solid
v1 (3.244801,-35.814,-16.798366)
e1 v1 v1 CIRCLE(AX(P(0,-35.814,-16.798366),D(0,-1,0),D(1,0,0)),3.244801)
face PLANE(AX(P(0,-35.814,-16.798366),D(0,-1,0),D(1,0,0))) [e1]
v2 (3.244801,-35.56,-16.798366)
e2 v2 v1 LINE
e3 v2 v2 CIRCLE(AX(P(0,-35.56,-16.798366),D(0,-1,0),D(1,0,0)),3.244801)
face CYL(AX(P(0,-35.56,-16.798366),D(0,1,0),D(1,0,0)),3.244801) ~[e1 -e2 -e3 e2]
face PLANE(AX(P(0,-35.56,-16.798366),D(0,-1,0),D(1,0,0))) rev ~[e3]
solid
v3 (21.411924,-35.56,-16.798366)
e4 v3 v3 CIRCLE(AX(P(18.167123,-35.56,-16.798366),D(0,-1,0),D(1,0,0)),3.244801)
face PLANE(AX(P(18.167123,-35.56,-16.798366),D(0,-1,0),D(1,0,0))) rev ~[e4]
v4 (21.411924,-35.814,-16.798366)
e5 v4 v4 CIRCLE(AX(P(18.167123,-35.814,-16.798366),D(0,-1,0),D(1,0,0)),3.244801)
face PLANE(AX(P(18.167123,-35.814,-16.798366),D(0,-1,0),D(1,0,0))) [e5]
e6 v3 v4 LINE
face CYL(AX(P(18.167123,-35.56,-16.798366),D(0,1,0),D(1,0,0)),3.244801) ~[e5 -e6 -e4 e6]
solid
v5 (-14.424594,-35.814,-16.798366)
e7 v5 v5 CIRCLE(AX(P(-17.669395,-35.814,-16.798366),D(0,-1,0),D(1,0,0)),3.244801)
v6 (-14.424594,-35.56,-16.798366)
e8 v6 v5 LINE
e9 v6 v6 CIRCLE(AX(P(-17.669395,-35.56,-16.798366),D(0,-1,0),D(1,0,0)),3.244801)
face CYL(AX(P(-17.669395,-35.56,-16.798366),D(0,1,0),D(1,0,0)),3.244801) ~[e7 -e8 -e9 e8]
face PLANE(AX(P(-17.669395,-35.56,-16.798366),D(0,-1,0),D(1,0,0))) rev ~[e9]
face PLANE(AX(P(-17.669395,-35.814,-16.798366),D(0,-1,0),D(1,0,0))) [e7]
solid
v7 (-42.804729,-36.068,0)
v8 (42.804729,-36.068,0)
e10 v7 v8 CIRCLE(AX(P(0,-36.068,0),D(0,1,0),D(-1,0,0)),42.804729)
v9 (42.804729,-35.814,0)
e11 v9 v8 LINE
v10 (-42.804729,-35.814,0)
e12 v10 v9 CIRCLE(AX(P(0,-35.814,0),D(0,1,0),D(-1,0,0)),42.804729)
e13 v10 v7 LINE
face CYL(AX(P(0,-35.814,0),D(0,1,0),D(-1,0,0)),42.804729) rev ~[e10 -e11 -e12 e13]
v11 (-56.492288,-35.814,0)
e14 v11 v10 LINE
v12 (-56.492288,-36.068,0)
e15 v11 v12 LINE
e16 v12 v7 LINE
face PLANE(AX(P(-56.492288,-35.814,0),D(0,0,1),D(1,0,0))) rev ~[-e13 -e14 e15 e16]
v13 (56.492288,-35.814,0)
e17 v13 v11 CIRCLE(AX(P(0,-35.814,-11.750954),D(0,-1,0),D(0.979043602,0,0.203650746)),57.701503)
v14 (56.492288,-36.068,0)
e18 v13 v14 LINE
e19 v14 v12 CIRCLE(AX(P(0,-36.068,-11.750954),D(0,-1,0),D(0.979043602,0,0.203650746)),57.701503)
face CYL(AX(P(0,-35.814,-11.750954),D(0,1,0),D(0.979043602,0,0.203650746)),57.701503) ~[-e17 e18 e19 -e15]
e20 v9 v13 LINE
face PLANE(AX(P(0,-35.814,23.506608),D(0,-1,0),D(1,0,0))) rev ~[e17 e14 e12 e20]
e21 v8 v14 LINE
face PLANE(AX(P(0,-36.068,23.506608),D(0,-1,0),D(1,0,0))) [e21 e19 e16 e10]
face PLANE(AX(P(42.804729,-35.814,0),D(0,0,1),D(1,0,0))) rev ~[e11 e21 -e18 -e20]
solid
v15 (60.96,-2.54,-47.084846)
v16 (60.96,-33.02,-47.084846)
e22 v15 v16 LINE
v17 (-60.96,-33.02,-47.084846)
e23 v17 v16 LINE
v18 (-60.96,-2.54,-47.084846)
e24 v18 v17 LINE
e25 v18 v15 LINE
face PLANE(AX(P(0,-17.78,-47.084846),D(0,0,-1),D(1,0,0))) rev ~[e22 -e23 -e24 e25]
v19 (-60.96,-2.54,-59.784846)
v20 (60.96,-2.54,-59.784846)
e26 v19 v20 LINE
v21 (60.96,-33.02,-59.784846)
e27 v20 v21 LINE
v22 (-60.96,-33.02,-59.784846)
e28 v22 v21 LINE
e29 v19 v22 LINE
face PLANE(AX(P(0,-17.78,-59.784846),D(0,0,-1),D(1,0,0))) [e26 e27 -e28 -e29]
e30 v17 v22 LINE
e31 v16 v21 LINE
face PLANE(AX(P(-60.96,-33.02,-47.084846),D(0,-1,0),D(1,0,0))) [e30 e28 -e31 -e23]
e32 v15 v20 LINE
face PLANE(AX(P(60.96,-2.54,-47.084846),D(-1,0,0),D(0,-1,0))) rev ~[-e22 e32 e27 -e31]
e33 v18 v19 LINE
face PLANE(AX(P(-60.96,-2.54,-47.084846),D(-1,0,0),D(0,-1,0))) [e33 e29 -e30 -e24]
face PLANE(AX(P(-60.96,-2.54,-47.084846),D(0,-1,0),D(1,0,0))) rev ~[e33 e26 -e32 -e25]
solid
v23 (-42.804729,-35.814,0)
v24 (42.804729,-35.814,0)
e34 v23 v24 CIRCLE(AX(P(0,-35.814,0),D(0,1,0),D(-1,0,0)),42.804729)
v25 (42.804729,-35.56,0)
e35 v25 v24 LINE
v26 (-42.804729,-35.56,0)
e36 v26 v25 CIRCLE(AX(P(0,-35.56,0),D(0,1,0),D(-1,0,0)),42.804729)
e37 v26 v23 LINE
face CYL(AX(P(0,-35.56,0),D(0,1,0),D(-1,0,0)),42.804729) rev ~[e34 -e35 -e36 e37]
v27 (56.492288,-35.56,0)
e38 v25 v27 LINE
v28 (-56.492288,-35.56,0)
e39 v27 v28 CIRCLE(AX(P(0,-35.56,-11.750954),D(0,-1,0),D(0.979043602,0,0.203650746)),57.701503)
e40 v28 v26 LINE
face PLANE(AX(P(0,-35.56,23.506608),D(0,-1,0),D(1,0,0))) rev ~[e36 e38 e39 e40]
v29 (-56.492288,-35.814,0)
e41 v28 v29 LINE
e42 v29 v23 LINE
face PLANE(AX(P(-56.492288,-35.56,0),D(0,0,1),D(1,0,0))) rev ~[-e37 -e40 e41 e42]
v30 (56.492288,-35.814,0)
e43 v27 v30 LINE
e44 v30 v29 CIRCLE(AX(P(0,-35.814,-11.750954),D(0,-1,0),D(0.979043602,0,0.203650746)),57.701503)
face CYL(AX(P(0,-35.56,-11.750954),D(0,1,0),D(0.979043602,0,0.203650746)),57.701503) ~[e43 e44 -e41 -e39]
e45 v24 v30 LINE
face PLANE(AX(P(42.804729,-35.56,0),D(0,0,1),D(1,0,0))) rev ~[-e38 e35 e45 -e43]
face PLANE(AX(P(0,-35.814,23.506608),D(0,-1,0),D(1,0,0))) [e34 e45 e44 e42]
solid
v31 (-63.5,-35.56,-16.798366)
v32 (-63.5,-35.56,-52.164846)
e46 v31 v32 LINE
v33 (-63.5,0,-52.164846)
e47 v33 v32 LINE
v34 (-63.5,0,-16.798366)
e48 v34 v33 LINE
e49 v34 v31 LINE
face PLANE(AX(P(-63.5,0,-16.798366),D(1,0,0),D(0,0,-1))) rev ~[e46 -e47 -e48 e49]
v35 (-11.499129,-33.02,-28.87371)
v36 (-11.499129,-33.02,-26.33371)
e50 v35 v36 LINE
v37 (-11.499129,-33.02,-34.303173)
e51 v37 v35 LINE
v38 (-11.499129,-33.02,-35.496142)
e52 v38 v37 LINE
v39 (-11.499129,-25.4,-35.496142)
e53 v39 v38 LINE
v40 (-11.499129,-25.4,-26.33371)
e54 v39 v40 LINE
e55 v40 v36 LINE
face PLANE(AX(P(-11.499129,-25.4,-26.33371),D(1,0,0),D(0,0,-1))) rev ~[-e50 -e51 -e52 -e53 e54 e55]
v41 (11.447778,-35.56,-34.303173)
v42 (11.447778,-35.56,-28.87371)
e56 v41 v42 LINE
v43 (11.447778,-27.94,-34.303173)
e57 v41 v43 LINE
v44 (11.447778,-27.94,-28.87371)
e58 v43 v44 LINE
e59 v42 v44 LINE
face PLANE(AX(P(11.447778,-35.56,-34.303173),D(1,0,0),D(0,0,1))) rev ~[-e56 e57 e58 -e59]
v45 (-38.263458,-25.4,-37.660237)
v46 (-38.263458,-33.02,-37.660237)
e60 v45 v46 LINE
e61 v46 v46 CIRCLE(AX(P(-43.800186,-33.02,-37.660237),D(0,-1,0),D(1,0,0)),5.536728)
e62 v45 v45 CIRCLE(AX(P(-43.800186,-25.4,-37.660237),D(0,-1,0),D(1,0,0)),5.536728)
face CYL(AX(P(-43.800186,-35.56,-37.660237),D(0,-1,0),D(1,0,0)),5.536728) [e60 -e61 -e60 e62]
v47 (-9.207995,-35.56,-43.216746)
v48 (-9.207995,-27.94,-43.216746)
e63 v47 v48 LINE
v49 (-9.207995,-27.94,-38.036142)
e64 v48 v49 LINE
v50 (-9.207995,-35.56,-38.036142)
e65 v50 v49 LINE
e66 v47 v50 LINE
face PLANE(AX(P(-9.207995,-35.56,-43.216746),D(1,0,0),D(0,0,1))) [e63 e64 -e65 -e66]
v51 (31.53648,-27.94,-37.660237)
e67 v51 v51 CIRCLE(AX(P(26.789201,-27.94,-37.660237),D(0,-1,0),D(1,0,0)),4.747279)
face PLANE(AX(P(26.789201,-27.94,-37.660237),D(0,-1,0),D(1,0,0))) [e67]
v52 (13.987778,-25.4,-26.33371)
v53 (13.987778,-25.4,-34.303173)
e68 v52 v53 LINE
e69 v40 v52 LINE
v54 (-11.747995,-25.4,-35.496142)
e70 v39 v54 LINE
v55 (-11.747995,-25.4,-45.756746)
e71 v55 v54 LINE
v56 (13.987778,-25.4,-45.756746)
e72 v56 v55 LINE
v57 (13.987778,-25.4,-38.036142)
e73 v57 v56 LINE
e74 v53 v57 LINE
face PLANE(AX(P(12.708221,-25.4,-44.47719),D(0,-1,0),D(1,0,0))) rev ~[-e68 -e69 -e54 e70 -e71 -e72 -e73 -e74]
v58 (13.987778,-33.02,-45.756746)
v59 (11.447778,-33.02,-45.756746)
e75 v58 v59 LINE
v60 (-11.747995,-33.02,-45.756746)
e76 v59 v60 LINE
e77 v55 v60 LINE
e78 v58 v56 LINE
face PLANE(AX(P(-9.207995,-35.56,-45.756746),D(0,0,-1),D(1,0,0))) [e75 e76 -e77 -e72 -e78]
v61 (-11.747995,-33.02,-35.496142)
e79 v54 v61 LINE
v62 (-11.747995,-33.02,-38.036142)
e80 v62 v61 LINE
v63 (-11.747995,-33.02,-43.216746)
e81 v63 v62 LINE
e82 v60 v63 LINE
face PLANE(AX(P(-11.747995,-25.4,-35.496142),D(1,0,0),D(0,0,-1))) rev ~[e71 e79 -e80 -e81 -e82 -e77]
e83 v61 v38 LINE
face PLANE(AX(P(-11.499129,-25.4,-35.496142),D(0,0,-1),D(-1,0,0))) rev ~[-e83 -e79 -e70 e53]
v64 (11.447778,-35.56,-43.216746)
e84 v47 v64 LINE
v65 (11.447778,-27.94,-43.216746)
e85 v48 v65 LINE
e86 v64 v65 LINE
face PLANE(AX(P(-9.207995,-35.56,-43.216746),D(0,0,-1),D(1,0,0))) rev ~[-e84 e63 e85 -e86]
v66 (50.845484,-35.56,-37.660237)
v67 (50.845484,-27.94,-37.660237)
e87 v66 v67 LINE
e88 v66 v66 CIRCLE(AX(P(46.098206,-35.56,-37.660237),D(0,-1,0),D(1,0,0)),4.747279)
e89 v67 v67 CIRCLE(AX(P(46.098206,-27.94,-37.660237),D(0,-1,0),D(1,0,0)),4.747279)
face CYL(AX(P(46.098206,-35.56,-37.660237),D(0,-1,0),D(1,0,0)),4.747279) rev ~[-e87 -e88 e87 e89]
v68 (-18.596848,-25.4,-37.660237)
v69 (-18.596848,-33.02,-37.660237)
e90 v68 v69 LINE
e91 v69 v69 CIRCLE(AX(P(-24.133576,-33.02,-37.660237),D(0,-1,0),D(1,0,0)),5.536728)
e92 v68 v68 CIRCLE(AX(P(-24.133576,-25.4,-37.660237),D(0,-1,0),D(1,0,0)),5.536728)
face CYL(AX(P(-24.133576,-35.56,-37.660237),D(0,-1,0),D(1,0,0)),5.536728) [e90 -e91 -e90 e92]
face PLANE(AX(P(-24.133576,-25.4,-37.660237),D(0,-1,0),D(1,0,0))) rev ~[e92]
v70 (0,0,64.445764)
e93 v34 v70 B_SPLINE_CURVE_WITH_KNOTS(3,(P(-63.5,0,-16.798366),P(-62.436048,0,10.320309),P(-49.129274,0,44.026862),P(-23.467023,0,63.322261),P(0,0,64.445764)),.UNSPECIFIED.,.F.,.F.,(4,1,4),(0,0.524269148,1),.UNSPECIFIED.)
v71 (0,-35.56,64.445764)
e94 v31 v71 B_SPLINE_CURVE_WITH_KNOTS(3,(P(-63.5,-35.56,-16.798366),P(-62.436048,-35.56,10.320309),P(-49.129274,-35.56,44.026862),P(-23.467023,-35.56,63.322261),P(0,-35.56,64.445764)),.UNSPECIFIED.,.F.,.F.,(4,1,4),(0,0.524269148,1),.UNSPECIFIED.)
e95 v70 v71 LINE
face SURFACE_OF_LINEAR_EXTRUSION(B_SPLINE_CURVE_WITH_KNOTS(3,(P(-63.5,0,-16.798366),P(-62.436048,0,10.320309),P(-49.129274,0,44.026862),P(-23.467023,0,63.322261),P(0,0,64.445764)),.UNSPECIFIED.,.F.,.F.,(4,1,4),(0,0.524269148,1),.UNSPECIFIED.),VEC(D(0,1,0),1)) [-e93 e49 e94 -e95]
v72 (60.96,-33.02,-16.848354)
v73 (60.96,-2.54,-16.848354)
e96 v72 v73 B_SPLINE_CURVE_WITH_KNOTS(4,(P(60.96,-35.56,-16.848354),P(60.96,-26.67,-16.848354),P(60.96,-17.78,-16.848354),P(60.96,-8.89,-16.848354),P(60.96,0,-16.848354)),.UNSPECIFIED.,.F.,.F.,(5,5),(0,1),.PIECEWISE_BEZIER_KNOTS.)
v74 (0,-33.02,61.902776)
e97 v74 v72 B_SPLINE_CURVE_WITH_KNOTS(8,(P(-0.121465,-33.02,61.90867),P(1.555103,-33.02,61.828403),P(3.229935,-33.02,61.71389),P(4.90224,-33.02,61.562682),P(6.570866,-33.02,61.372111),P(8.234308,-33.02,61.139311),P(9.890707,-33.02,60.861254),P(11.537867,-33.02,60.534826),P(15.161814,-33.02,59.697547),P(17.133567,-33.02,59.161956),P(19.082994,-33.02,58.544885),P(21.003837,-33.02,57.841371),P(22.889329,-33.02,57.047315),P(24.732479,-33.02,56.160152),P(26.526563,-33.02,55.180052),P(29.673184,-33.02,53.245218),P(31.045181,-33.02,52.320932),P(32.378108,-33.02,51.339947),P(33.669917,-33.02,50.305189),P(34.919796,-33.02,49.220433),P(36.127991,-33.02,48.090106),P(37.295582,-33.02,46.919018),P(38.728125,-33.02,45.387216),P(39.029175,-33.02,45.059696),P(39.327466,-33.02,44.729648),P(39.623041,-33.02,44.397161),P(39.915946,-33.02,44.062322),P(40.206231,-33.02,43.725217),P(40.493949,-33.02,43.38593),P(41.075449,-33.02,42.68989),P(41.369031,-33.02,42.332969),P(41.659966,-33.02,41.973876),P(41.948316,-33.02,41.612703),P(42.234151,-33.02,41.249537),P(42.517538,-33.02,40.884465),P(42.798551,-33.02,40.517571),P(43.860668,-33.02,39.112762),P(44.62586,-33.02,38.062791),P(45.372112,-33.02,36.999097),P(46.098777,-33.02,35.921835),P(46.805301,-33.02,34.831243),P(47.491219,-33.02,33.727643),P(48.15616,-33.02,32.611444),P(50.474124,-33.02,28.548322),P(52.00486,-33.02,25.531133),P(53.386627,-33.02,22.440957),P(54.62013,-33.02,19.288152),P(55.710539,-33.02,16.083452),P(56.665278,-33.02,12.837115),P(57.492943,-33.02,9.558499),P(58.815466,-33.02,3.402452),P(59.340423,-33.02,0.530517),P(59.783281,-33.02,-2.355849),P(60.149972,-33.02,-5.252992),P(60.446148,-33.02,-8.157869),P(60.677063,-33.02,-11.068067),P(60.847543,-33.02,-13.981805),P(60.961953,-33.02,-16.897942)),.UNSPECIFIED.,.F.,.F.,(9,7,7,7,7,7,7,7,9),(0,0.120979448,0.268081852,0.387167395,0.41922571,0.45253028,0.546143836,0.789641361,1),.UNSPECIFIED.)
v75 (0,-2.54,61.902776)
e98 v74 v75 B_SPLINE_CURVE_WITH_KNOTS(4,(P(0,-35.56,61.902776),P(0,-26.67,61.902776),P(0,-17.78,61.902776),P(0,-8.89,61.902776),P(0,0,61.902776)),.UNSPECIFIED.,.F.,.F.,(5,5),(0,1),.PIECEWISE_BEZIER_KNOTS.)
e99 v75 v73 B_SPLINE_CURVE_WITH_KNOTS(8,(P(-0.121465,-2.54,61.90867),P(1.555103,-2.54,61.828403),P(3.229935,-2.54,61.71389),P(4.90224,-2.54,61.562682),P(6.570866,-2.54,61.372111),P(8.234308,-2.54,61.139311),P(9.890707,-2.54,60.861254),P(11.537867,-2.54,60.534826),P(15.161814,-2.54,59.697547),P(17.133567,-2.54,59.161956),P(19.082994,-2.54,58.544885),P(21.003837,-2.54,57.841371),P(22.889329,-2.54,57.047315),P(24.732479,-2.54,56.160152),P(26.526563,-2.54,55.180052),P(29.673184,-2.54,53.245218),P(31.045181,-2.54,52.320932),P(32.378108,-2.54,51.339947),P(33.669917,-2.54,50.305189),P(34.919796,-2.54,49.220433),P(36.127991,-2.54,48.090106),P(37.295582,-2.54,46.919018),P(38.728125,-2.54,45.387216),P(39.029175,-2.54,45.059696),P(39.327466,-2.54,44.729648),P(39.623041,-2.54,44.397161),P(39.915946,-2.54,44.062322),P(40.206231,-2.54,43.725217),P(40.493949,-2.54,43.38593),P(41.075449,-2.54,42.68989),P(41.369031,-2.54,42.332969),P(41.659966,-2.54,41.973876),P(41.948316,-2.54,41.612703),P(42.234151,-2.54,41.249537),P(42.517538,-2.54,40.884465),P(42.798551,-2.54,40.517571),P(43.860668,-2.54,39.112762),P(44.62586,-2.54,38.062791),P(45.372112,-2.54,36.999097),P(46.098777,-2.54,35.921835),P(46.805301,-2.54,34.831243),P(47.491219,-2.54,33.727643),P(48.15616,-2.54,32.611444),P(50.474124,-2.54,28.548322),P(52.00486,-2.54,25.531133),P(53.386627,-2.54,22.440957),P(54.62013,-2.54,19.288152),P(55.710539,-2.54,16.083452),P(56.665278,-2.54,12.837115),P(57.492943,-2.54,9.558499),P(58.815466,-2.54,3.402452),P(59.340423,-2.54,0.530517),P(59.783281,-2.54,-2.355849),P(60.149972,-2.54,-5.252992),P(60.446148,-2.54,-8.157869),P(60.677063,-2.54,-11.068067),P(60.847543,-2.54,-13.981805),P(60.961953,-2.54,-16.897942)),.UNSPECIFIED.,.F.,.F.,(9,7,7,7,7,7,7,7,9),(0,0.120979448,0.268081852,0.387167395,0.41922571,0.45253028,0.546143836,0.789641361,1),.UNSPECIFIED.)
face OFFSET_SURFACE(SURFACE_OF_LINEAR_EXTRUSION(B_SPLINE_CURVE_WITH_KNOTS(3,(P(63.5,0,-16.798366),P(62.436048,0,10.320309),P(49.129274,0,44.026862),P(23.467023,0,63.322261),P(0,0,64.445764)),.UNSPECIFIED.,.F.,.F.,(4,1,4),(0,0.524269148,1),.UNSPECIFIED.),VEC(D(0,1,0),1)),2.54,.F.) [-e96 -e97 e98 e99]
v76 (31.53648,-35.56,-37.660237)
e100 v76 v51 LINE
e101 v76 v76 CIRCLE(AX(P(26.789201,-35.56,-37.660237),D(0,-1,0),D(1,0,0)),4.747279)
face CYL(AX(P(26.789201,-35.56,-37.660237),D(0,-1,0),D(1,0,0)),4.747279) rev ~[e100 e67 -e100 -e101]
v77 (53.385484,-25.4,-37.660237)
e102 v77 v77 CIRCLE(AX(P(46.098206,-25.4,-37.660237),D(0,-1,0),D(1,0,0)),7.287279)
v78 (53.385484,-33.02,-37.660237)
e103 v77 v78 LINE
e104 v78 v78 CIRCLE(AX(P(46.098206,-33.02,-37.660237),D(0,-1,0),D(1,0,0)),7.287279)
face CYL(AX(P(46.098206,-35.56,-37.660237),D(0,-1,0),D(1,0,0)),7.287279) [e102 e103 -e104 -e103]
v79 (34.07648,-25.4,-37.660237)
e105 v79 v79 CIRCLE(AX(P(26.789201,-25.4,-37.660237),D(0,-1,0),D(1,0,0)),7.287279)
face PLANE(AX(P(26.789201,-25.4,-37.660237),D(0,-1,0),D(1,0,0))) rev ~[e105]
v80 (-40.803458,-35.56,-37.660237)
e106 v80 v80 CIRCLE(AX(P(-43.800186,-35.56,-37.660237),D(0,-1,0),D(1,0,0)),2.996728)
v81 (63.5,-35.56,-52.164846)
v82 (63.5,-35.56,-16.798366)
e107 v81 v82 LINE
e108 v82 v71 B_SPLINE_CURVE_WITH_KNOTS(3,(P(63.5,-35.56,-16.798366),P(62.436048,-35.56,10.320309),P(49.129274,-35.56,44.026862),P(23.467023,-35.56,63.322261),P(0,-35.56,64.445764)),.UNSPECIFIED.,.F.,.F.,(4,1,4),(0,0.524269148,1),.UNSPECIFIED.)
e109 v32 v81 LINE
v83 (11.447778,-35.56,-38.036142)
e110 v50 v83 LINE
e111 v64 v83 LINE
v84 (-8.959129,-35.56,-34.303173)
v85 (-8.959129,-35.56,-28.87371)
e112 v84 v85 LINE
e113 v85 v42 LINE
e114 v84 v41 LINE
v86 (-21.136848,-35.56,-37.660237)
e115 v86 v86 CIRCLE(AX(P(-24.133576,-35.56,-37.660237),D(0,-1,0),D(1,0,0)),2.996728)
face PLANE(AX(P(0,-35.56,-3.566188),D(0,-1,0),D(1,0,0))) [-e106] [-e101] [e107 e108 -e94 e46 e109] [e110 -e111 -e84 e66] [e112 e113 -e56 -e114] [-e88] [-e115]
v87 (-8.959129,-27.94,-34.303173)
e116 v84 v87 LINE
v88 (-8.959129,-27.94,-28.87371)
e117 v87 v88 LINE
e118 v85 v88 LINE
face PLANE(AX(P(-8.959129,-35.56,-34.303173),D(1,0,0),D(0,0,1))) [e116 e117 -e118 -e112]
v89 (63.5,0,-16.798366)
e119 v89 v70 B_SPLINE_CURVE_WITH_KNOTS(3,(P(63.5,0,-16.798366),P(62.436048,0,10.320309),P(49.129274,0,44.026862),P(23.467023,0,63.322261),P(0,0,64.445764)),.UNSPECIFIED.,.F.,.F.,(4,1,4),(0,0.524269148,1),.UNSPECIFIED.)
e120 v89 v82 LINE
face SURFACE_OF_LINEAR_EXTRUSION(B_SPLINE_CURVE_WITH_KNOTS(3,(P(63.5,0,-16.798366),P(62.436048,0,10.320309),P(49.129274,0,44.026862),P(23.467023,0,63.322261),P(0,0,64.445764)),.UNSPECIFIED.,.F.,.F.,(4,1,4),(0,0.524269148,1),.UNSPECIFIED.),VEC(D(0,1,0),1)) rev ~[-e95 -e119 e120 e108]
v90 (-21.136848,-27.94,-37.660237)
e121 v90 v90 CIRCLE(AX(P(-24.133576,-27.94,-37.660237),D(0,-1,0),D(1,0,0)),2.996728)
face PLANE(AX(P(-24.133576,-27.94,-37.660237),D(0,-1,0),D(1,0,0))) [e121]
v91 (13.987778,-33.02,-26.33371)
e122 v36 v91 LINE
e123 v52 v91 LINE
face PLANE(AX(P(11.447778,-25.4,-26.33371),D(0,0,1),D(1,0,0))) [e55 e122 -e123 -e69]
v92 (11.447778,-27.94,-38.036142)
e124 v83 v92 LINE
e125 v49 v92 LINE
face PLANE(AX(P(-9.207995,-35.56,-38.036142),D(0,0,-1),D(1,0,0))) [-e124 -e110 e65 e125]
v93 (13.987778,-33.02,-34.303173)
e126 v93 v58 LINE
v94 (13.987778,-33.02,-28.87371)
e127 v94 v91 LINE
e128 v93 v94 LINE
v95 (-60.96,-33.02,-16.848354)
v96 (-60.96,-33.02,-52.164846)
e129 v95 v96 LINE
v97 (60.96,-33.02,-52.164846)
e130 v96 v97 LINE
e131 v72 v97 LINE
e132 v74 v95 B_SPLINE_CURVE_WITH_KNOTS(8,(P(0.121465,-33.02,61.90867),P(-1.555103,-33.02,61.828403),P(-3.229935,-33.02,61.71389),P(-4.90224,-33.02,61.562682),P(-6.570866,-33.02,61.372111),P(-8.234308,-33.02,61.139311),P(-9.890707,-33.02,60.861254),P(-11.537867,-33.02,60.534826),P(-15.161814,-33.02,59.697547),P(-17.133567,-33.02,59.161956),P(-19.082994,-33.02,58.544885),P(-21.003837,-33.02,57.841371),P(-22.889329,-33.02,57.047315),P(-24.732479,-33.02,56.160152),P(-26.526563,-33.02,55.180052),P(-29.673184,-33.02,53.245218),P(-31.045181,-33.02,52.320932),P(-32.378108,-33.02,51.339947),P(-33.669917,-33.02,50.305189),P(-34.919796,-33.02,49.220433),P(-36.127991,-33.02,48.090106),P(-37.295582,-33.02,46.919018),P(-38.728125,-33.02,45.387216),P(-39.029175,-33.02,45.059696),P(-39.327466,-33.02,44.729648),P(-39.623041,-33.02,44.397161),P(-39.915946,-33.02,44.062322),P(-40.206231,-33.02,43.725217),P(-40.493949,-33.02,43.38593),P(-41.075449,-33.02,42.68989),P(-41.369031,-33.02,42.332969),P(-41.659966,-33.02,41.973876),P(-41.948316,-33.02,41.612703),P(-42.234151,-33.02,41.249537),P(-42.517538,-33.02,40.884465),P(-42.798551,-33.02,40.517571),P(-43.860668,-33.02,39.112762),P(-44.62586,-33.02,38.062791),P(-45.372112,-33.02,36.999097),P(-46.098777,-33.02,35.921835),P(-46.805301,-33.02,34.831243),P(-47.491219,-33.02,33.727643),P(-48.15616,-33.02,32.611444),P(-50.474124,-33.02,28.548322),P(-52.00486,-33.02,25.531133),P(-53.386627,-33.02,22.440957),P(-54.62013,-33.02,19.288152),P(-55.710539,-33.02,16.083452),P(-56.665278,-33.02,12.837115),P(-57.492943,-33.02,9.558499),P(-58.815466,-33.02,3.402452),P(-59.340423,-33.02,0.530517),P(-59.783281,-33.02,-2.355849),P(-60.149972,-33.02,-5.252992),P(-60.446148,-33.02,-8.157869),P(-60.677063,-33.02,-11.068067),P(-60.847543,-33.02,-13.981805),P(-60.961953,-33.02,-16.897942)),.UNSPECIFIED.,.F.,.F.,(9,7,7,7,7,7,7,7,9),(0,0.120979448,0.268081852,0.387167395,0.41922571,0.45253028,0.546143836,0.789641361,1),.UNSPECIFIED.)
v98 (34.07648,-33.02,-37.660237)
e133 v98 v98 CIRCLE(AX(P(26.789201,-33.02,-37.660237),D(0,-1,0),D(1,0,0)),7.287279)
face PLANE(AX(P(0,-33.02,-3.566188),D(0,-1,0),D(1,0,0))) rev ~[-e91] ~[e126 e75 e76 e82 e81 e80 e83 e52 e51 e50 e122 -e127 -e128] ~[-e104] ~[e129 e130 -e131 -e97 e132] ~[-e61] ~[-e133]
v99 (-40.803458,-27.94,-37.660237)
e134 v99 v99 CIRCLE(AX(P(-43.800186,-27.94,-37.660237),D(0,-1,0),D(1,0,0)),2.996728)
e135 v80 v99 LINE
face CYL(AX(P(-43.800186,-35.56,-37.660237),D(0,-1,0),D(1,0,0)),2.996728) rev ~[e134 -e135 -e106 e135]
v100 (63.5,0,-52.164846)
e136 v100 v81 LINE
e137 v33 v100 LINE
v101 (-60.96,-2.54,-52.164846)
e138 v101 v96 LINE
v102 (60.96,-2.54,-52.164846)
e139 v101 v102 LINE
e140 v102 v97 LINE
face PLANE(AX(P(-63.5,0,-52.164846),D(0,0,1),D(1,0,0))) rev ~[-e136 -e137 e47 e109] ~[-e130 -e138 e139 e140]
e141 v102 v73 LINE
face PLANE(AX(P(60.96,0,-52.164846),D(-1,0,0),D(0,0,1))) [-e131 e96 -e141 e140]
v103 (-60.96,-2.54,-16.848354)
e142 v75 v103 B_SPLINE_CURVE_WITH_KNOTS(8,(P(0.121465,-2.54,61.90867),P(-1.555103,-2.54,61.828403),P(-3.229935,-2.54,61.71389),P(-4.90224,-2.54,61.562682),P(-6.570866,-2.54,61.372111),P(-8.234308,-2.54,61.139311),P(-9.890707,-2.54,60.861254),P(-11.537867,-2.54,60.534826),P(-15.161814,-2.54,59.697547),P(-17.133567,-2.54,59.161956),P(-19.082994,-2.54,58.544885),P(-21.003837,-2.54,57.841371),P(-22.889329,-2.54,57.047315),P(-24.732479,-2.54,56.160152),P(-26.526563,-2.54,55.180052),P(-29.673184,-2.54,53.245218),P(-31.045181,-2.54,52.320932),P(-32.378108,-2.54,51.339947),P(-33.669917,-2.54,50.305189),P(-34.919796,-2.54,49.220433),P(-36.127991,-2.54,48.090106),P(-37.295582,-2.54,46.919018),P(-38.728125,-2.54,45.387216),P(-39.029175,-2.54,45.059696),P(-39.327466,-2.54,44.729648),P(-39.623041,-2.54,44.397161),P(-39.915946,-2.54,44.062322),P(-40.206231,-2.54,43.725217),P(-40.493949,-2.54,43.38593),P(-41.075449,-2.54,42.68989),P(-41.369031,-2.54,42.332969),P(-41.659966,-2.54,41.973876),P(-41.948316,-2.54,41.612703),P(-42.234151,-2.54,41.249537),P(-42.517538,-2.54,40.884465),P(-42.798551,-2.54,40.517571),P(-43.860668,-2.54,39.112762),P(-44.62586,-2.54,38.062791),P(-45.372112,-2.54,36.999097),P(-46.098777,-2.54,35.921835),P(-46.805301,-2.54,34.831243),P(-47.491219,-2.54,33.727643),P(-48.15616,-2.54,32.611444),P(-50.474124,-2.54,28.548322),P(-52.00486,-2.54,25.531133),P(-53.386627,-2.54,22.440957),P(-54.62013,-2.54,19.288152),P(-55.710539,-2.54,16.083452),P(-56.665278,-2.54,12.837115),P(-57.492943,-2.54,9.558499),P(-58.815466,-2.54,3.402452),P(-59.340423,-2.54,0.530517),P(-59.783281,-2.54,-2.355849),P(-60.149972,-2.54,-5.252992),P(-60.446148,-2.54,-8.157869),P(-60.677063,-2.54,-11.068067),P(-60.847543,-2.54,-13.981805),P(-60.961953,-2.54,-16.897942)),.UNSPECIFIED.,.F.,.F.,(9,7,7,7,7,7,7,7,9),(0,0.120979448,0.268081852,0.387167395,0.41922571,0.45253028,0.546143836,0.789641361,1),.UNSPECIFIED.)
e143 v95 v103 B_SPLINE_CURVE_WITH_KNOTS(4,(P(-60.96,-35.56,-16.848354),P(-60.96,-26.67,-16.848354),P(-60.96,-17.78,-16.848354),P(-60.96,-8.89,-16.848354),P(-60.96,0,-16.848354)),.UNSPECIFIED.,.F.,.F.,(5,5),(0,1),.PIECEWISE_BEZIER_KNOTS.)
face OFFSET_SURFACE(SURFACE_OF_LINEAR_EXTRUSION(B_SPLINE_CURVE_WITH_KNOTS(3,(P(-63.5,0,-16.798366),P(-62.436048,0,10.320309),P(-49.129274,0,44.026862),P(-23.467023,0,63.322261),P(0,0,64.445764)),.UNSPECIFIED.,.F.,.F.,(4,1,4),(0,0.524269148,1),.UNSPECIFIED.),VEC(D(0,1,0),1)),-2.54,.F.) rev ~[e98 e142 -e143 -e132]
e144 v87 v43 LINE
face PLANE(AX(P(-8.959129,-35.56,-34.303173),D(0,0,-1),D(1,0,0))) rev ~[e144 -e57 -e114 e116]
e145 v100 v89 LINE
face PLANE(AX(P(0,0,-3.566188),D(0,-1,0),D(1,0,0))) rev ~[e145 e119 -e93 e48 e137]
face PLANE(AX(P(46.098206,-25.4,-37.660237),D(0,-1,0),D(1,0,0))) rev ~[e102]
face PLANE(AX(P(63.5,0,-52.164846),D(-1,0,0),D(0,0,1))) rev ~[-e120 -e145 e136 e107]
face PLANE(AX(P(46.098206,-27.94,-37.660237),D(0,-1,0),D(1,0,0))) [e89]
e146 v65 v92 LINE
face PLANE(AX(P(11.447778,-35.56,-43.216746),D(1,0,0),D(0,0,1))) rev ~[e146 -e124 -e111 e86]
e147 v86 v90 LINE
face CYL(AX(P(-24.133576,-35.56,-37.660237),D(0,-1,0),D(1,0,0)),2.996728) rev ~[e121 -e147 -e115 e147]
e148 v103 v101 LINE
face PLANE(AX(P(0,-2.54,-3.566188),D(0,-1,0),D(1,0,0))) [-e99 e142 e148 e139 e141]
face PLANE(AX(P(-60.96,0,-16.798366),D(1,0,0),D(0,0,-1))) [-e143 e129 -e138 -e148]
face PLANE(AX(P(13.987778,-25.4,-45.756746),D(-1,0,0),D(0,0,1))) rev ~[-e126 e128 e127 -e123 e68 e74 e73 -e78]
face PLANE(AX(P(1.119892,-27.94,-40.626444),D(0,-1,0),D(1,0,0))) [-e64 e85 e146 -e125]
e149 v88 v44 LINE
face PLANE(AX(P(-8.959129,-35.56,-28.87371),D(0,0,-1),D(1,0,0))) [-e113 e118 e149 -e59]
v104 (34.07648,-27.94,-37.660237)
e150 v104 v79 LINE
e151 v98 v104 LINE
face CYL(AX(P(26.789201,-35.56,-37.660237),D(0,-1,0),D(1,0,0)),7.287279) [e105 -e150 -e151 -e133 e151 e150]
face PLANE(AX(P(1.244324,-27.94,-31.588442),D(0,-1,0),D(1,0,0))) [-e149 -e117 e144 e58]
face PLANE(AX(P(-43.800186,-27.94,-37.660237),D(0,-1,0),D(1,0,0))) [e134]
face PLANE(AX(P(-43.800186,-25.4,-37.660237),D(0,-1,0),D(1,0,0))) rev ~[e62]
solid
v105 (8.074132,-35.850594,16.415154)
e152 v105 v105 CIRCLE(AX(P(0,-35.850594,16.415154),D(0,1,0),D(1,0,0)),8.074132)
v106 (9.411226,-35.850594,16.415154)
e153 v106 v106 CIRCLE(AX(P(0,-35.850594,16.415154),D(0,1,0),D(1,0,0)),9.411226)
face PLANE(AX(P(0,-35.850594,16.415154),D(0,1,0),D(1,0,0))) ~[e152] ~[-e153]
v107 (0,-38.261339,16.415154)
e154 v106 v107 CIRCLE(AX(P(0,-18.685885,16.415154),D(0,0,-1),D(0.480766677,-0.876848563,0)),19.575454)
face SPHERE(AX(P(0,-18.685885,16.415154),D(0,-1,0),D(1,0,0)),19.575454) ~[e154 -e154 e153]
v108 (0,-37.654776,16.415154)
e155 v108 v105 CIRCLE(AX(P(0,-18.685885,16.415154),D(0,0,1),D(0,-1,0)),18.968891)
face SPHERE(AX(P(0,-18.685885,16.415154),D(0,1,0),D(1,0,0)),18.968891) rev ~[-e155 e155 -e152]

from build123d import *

# Parameters (mm, degrees)
F1_DEPTH     = 35.56
F2_W         = 20.4069074243
F2_H         = 5.429463461
F2_W_2       = 20.6557726488
F2_H_2       = 5.1806047559
F2_R         = 4.7472786305
F2_R_2       = 2.9967281819
F3_DEPTH     = 7.62
F5_DEPTH     = 0.254
F4_R         = 3.2448006106
F6_DEPTH     = 0.254
F7_T         = 2.54
F7_T3_DEPTH  = 12.7
F7_T5_DEPTH  = 25.7357726488
F7_T7_DEPTH  = 10.2606047559
F7_T9_DEPTH  = 25.4869074243
F7_T11_DEPTH = 10.509463461
F9_W         = 121.92
F9_H         = 30.48
F10_DEPTH    = 12.7


# Not quite as in the source:
# - a shell that OpenCascade refuses in one call is made with other operations: the cavity is built on its own and cut out


with BuildPart() as f1:
    # F0 (on Front) → F1 (new body)
    with BuildSketch(Plane.XZ):
        with BuildLine():
            Line((-63.5, -52.164846403), (0, -52.164846403))
            Line((0, -52.164846403), (63.5, -52.164846403))
            Line((63.5, -52.164846403), (63.5, -16.7983658612))
            add(Edge.make_bspline(
                [(63.5, -16.7983658612), (62.4360478279, 10.32030946), (49.129273617, 44.0268624364), (23.4670229256, 63.3222609758), (0, 64.4457638264)],
                knots=[0, 0, 0, 0, 0.5242691479, 1, 1, 1, 1], degree=3))
            add(Edge.make_bspline(
                [(-63.5, -16.7983658612), (-62.4360478279, 10.32030946), (-49.129273617, 44.0268624364), (-23.4670229256, 63.3222609758), (0, 64.4457638264)],
                knots=[0, 0, 0, 0, 0.5242691479, 1, 1, 1, 1], degree=3))
            Line((-63.5, -16.7983658612), (-63.5, -52.164846403))
        make_face()
    extrude(amount=F1_DEPTH)

    # F2 (on face) → F3 (cut)
    with BuildSketch(Plane.XZ.offset(35.56)):
        with Locations((1.2443242595, -31.5884416923)):
            Rectangle(F2_W, F2_H)
        with Locations((1.1198916472, -40.6264439225)):
            Rectangle(F2_W_2, F2_H_2)
        with Locations((26.7892014235, -37.6602374017)):
            Circle(F2_R)
        with Locations((46.0982057871, -37.6602374017)):
            Circle(F2_R)
        with Locations((-24.1335762036, -37.6602374017)):
            Circle(F2_R_2)
        with Locations((-43.8001863658, -37.6602374017)):
            Circle(F2_R_2)
    extrude(amount=-F3_DEPTH, mode=Mode.SUBTRACT)

    # F7: shell of thickness 2.54, made by hand


with BuildPart() as f5:
    # F4 (on face) → F5 (new body)
    with BuildSketch(Plane.XZ.offset(35.56)):
        with BuildLine():
            Line((-56.4922876656, 0), (-42.8047291934, 0))
            ThreePointArc((-42.8047291934, 0), (0, 42.8047291934), (42.8047291934, 0))
            Line((42.8047291934, 0), (56.4922876656, 0))
            ThreePointArc((56.4922876656, 0), (0, 45.95054916), (-56.4922876656, 0))
        make_face()
    extrude(amount=F5_DEPTH)


with BuildPart() as f5b:
    # F4 (on face) → F5, piece 2 (new body)
    with BuildSketch(Plane.XZ.offset(35.56)):
        with Locations((-17.6693946123, -16.7983658612)):
            Circle(F4_R)
    extrude(amount=F5_DEPTH)


with BuildPart() as f5c:
    # F4 (on face) → F5, piece 3 (new body)
    with BuildSketch(Plane.XZ.offset(35.56)):
        with Locations((0, -16.7983658612)):
            Circle(F4_R)
    extrude(amount=F5_DEPTH)


with BuildPart() as f5d:
    # F4 (on face) → F5, piece 4 (new body)
    with BuildSketch(Plane.XZ.offset(35.56)):
        with Locations((18.1671231985, -16.7983658612)):
            Circle(F4_R)
    extrude(amount=F5_DEPTH)


with BuildPart() as f6:
    # F6 (new): a face of the model
    f6_faces = [f5.part.faces().sort_by_distance(p)[0] for p in [
        (-49.6485084295, -35.814, 1.2197117377),
    ]]
    extrude(f6_faces, amount=F6_DEPTH)


with BuildPart() as f7_core1:
    # F7_t2: copy of F1
    add(f1.part)

    # the walls: a layer under each face that stays
    f7_faces = [f7_core1.faces().sort_by_distance(p)[0] for p in [
        (-63.5, -17.78, -34.4816061321),
        (0, -35.56, 6.1404587117),
        (63.5, -17.78, -34.4816061321),
        (0, 0, 6.1404587117),
        (-46.5057501218, -17.78, 39.7718854475),
        (46.5057501218, -17.78, 39.7718854475),
        (1.1198916472, -31.75, -38.0361415446),
        (-9.2079946771, -31.75, -40.6264439225),
        (1.1198916472, -31.75, -43.2167463005),
        (11.4477779716, -31.75, -40.6264439225),
        (-46.7969145477, -31.75, -37.6602374017),
        (-27.1303043855, -31.75, -37.6602374017),
        (22.041922793, -31.75, -37.6602374017),
        (41.3509271565, -31.75, -37.6602374017),
        (1.2443242595, -31.75, -28.8737099618),
        (-8.9591294527, -31.75, -31.5884416923),
        (1.2443242595, -31.75, -34.3031734228),
        (11.4477779716, -31.75, -31.5884416923),
        (1.1198916472, -27.94, -40.6264439225),
        (-43.8001863658, -27.94, -37.6602374017),
        (-24.1335762036, -27.94, -37.6602374017),
        (26.7892014235, -27.94, -37.6602374017),
        (46.0982057871, -27.94, -37.6602374017),
        (1.2443242595, -27.94, -31.5884416923),
    ]]
    thicken(f7_faces, amount=-F7_T, mode=Mode.SUBTRACT)

    # F7_s4 → F7_t3 (cut)
    with BuildSketch(Plane.XZ.offset(25.4)):
        Polygon((11.4223779716, -38.0615415446), (11.4477779716, -35.4961415446), (13.9877779716, -35.4961415446), (13.9877779716, -38.0361415446), align=None)
        Polygon((-9.1825946771, -38.0615415446), (-9.2079946771, -35.4961415446), (-11.7479946771, -35.4961415446), (-11.7479946771, -38.0361415446), align=None)
        Polygon((-9.1825946771, -43.1913463005), (-11.7479946771, -43.2167463005), (-11.7479946771, -45.7567463005), (-9.2079946771, -45.7567463005), align=None)
        Polygon((11.4223779716, -43.1913463005), (11.4477779716, -45.7567463005), (13.9877779716, -45.7567463005), (13.9877779716, -43.2167463005), align=None)
        Polygon((11.4223779716, -28.8991099618), (11.4477779716, -26.3337099618), (13.9877779716, -26.3337099618), (13.9877779716, -28.8737099618), align=None)
        Polygon((-8.9337294527, -28.8991099618), (-8.9591294527, -26.3337099618), (-11.4991294527, -26.3337099618), (-11.4991294527, -28.8737099618), align=None)
        Polygon((-8.9337294527, -34.2777734228), (-11.4991294527, -34.3031734228), (-11.4991294527, -36.8431734228), (-8.9591294527, -36.8431734228), align=None)
        Polygon((11.4223779716, -34.2777734228), (11.4477779716, -36.8431734228), (13.9877779716, -36.8431734228), (13.9877779716, -34.3031734228), align=None)
    extrude(amount=F7_T3_DEPTH, mode=Mode.SUBTRACT)

    # F7_s6 → F7_t5 (cut)
    with BuildSketch(Plane.YZ.offset(-11.7479946771)):
        Polygon((-27.9654, -38.0615415446), (-27.94, -35.4961415446), (-25.4, -35.4961415446), (-25.4, -38.0361415446), align=None)
        Polygon((-27.9654, -43.1913463005), (-27.94, -45.7567463005), (-25.4, -45.7567463005), (-25.4, -43.2167463005), align=None)
    extrude(amount=F7_T5_DEPTH, mode=Mode.SUBTRACT)

    # F7_s8 → F7_t7 (cut)
    with BuildSketch(Plane.XY.offset(-45.7567463005)):
        Polygon((-9.1825946771, -27.9654), (-11.7479946771, -27.94), (-11.7479946771, -25.4), (-9.2079946771, -25.4), align=None)
        Polygon((11.4223779716, -27.9654), (13.9877779716, -27.94), (13.9877779716, -25.4), (11.4477779716, -25.4), align=None)
    extrude(amount=F7_T7_DEPTH, mode=Mode.SUBTRACT)

    # F7_s10 → F7_t9 (cut)
    with BuildSketch(Plane.YZ.offset(-11.4991294527)):
        Polygon((-27.9654, -28.8991099618), (-27.94, -26.3337099618), (-25.4, -26.3337099618), (-25.4, -28.8737099618), align=None)
        Polygon((-27.9654, -34.2777734228), (-27.94, -36.8431734228), (-25.4, -36.8431734228), (-25.4, -34.3031734228), align=None)
    extrude(amount=F7_T9_DEPTH, mode=Mode.SUBTRACT)

    # F7_s12 → F7_t11 (cut)
    with BuildSketch(Plane.XY.offset(-36.8431734228)):
        Polygon((-8.9337294527, -27.9654), (-11.4991294527, -27.94), (-11.4991294527, -25.4), (-8.9591294527, -25.4), align=None)
        Polygon((11.4223779716, -27.9654), (13.9877779716, -27.94), (13.9877779716, -25.4), (11.4477779716, -25.4), align=None)
    extrude(amount=F7_T11_DEPTH, mode=Mode.SUBTRACT)

    # F7_s13 → F7_t14 (revolve, cut)
    with BuildSketch(Plane.XY.offset(-37.6602374017)):
        Polygon((-40.8288581839, -27.9654), (-38.2634581839, -27.94), (-38.2634581839, -25.4), (-40.8034581839, -25.4), align=None)
    revolve(axis=Axis((-43.8001863658, -27.94, -37.6602374017), (0, -1, 0)), mode=Mode.SUBTRACT)

    # F7_s15 → F7_t16 (revolve, cut)
    with BuildSketch(Plane.XY.offset(-37.6602374017)):
        Polygon((-21.1622480217, -27.9654), (-18.5968480217, -27.94), (-18.5968480217, -25.4), (-21.1368480217, -25.4), align=None)
    revolve(axis=Axis((-24.1335762036, -27.94, -37.6602374017), (0, -1, 0)), mode=Mode.SUBTRACT)

    # F7_s17 → F7_t18 (revolve, cut)
    with BuildSketch(Plane.XY.offset(-37.6602374017)):
        Polygon((31.5110800541, -27.9654), (34.0764800541, -27.94), (34.0764800541, -25.4), (31.5364800541, -25.4), align=None)
    revolve(axis=Axis((26.7892014235, -27.94, -37.6602374017), (0, -1, 0)), mode=Mode.SUBTRACT)

    # F7_s19 → F7_t20 (revolve, cut)
    with BuildSketch(Plane.XY.offset(-37.6602374017)):
        Polygon((50.8200844176, -27.9654), (53.3854844176, -27.94), (53.3854844176, -25.4), (50.8454844176, -25.4), align=None)
    revolve(axis=Axis((46.0982057871, -27.94, -37.6602374017), (0, -1, 0)), mode=Mode.SUBTRACT)


with BuildPart() as f1_1:
    add(f1.part)

    # what is left inside the walls is the cavity
    f7_cavity = [f7_core1.part.solids().sort_by_distance(p)[0] for p in [
        (0, -2.5654, -14.142306),
    ]]
    add(f7_cavity, mode=Mode.SUBTRACT)


with BuildPart() as f10:
    # F9 (on offset) → F10 (new body)
    with BuildSketch(Plane(origin=(0, 0, -47.084846403), x_dir=(1, 0, 0), z_dir=(0, 0, -1))):
        with Locations((0, 17.78)):
            Rectangle(F9_W, F9_H)
    extrude(amount=F10_DEPTH)


with BuildPart() as f13:
    # F12 (on offset) → F13 (revolve)
    with BuildSketch(Plane(origin=(0, 0, 16.415153597), x_dir=(1, 0, 0), z_dir=(0, 0, -1))):
        with BuildLine():
            ThreePointArc((9.4112261052, 35.8505937442), (4.8575423267, 37.6490778959), (0, 38.2613390684))
            Line((0, 38.2613390684), (0, 37.6547761261))
            ThreePointArc((0, 37.6547761261), (4.1366254111, 37.1982365786), (8.074131848, 35.8505937442))
            Line((8.074131848, 35.8505937442), (9.4112261052, 35.8505937442))
        make_face()
    revolve(axis=Axis((0, -35.8350872993, 16.415153597), (0, 1, 0)))


solid = Compound([f5.part, f5b.part, f5c.part, f5d.part, f6.part, f1_1.part, f10.part, f13.part])
